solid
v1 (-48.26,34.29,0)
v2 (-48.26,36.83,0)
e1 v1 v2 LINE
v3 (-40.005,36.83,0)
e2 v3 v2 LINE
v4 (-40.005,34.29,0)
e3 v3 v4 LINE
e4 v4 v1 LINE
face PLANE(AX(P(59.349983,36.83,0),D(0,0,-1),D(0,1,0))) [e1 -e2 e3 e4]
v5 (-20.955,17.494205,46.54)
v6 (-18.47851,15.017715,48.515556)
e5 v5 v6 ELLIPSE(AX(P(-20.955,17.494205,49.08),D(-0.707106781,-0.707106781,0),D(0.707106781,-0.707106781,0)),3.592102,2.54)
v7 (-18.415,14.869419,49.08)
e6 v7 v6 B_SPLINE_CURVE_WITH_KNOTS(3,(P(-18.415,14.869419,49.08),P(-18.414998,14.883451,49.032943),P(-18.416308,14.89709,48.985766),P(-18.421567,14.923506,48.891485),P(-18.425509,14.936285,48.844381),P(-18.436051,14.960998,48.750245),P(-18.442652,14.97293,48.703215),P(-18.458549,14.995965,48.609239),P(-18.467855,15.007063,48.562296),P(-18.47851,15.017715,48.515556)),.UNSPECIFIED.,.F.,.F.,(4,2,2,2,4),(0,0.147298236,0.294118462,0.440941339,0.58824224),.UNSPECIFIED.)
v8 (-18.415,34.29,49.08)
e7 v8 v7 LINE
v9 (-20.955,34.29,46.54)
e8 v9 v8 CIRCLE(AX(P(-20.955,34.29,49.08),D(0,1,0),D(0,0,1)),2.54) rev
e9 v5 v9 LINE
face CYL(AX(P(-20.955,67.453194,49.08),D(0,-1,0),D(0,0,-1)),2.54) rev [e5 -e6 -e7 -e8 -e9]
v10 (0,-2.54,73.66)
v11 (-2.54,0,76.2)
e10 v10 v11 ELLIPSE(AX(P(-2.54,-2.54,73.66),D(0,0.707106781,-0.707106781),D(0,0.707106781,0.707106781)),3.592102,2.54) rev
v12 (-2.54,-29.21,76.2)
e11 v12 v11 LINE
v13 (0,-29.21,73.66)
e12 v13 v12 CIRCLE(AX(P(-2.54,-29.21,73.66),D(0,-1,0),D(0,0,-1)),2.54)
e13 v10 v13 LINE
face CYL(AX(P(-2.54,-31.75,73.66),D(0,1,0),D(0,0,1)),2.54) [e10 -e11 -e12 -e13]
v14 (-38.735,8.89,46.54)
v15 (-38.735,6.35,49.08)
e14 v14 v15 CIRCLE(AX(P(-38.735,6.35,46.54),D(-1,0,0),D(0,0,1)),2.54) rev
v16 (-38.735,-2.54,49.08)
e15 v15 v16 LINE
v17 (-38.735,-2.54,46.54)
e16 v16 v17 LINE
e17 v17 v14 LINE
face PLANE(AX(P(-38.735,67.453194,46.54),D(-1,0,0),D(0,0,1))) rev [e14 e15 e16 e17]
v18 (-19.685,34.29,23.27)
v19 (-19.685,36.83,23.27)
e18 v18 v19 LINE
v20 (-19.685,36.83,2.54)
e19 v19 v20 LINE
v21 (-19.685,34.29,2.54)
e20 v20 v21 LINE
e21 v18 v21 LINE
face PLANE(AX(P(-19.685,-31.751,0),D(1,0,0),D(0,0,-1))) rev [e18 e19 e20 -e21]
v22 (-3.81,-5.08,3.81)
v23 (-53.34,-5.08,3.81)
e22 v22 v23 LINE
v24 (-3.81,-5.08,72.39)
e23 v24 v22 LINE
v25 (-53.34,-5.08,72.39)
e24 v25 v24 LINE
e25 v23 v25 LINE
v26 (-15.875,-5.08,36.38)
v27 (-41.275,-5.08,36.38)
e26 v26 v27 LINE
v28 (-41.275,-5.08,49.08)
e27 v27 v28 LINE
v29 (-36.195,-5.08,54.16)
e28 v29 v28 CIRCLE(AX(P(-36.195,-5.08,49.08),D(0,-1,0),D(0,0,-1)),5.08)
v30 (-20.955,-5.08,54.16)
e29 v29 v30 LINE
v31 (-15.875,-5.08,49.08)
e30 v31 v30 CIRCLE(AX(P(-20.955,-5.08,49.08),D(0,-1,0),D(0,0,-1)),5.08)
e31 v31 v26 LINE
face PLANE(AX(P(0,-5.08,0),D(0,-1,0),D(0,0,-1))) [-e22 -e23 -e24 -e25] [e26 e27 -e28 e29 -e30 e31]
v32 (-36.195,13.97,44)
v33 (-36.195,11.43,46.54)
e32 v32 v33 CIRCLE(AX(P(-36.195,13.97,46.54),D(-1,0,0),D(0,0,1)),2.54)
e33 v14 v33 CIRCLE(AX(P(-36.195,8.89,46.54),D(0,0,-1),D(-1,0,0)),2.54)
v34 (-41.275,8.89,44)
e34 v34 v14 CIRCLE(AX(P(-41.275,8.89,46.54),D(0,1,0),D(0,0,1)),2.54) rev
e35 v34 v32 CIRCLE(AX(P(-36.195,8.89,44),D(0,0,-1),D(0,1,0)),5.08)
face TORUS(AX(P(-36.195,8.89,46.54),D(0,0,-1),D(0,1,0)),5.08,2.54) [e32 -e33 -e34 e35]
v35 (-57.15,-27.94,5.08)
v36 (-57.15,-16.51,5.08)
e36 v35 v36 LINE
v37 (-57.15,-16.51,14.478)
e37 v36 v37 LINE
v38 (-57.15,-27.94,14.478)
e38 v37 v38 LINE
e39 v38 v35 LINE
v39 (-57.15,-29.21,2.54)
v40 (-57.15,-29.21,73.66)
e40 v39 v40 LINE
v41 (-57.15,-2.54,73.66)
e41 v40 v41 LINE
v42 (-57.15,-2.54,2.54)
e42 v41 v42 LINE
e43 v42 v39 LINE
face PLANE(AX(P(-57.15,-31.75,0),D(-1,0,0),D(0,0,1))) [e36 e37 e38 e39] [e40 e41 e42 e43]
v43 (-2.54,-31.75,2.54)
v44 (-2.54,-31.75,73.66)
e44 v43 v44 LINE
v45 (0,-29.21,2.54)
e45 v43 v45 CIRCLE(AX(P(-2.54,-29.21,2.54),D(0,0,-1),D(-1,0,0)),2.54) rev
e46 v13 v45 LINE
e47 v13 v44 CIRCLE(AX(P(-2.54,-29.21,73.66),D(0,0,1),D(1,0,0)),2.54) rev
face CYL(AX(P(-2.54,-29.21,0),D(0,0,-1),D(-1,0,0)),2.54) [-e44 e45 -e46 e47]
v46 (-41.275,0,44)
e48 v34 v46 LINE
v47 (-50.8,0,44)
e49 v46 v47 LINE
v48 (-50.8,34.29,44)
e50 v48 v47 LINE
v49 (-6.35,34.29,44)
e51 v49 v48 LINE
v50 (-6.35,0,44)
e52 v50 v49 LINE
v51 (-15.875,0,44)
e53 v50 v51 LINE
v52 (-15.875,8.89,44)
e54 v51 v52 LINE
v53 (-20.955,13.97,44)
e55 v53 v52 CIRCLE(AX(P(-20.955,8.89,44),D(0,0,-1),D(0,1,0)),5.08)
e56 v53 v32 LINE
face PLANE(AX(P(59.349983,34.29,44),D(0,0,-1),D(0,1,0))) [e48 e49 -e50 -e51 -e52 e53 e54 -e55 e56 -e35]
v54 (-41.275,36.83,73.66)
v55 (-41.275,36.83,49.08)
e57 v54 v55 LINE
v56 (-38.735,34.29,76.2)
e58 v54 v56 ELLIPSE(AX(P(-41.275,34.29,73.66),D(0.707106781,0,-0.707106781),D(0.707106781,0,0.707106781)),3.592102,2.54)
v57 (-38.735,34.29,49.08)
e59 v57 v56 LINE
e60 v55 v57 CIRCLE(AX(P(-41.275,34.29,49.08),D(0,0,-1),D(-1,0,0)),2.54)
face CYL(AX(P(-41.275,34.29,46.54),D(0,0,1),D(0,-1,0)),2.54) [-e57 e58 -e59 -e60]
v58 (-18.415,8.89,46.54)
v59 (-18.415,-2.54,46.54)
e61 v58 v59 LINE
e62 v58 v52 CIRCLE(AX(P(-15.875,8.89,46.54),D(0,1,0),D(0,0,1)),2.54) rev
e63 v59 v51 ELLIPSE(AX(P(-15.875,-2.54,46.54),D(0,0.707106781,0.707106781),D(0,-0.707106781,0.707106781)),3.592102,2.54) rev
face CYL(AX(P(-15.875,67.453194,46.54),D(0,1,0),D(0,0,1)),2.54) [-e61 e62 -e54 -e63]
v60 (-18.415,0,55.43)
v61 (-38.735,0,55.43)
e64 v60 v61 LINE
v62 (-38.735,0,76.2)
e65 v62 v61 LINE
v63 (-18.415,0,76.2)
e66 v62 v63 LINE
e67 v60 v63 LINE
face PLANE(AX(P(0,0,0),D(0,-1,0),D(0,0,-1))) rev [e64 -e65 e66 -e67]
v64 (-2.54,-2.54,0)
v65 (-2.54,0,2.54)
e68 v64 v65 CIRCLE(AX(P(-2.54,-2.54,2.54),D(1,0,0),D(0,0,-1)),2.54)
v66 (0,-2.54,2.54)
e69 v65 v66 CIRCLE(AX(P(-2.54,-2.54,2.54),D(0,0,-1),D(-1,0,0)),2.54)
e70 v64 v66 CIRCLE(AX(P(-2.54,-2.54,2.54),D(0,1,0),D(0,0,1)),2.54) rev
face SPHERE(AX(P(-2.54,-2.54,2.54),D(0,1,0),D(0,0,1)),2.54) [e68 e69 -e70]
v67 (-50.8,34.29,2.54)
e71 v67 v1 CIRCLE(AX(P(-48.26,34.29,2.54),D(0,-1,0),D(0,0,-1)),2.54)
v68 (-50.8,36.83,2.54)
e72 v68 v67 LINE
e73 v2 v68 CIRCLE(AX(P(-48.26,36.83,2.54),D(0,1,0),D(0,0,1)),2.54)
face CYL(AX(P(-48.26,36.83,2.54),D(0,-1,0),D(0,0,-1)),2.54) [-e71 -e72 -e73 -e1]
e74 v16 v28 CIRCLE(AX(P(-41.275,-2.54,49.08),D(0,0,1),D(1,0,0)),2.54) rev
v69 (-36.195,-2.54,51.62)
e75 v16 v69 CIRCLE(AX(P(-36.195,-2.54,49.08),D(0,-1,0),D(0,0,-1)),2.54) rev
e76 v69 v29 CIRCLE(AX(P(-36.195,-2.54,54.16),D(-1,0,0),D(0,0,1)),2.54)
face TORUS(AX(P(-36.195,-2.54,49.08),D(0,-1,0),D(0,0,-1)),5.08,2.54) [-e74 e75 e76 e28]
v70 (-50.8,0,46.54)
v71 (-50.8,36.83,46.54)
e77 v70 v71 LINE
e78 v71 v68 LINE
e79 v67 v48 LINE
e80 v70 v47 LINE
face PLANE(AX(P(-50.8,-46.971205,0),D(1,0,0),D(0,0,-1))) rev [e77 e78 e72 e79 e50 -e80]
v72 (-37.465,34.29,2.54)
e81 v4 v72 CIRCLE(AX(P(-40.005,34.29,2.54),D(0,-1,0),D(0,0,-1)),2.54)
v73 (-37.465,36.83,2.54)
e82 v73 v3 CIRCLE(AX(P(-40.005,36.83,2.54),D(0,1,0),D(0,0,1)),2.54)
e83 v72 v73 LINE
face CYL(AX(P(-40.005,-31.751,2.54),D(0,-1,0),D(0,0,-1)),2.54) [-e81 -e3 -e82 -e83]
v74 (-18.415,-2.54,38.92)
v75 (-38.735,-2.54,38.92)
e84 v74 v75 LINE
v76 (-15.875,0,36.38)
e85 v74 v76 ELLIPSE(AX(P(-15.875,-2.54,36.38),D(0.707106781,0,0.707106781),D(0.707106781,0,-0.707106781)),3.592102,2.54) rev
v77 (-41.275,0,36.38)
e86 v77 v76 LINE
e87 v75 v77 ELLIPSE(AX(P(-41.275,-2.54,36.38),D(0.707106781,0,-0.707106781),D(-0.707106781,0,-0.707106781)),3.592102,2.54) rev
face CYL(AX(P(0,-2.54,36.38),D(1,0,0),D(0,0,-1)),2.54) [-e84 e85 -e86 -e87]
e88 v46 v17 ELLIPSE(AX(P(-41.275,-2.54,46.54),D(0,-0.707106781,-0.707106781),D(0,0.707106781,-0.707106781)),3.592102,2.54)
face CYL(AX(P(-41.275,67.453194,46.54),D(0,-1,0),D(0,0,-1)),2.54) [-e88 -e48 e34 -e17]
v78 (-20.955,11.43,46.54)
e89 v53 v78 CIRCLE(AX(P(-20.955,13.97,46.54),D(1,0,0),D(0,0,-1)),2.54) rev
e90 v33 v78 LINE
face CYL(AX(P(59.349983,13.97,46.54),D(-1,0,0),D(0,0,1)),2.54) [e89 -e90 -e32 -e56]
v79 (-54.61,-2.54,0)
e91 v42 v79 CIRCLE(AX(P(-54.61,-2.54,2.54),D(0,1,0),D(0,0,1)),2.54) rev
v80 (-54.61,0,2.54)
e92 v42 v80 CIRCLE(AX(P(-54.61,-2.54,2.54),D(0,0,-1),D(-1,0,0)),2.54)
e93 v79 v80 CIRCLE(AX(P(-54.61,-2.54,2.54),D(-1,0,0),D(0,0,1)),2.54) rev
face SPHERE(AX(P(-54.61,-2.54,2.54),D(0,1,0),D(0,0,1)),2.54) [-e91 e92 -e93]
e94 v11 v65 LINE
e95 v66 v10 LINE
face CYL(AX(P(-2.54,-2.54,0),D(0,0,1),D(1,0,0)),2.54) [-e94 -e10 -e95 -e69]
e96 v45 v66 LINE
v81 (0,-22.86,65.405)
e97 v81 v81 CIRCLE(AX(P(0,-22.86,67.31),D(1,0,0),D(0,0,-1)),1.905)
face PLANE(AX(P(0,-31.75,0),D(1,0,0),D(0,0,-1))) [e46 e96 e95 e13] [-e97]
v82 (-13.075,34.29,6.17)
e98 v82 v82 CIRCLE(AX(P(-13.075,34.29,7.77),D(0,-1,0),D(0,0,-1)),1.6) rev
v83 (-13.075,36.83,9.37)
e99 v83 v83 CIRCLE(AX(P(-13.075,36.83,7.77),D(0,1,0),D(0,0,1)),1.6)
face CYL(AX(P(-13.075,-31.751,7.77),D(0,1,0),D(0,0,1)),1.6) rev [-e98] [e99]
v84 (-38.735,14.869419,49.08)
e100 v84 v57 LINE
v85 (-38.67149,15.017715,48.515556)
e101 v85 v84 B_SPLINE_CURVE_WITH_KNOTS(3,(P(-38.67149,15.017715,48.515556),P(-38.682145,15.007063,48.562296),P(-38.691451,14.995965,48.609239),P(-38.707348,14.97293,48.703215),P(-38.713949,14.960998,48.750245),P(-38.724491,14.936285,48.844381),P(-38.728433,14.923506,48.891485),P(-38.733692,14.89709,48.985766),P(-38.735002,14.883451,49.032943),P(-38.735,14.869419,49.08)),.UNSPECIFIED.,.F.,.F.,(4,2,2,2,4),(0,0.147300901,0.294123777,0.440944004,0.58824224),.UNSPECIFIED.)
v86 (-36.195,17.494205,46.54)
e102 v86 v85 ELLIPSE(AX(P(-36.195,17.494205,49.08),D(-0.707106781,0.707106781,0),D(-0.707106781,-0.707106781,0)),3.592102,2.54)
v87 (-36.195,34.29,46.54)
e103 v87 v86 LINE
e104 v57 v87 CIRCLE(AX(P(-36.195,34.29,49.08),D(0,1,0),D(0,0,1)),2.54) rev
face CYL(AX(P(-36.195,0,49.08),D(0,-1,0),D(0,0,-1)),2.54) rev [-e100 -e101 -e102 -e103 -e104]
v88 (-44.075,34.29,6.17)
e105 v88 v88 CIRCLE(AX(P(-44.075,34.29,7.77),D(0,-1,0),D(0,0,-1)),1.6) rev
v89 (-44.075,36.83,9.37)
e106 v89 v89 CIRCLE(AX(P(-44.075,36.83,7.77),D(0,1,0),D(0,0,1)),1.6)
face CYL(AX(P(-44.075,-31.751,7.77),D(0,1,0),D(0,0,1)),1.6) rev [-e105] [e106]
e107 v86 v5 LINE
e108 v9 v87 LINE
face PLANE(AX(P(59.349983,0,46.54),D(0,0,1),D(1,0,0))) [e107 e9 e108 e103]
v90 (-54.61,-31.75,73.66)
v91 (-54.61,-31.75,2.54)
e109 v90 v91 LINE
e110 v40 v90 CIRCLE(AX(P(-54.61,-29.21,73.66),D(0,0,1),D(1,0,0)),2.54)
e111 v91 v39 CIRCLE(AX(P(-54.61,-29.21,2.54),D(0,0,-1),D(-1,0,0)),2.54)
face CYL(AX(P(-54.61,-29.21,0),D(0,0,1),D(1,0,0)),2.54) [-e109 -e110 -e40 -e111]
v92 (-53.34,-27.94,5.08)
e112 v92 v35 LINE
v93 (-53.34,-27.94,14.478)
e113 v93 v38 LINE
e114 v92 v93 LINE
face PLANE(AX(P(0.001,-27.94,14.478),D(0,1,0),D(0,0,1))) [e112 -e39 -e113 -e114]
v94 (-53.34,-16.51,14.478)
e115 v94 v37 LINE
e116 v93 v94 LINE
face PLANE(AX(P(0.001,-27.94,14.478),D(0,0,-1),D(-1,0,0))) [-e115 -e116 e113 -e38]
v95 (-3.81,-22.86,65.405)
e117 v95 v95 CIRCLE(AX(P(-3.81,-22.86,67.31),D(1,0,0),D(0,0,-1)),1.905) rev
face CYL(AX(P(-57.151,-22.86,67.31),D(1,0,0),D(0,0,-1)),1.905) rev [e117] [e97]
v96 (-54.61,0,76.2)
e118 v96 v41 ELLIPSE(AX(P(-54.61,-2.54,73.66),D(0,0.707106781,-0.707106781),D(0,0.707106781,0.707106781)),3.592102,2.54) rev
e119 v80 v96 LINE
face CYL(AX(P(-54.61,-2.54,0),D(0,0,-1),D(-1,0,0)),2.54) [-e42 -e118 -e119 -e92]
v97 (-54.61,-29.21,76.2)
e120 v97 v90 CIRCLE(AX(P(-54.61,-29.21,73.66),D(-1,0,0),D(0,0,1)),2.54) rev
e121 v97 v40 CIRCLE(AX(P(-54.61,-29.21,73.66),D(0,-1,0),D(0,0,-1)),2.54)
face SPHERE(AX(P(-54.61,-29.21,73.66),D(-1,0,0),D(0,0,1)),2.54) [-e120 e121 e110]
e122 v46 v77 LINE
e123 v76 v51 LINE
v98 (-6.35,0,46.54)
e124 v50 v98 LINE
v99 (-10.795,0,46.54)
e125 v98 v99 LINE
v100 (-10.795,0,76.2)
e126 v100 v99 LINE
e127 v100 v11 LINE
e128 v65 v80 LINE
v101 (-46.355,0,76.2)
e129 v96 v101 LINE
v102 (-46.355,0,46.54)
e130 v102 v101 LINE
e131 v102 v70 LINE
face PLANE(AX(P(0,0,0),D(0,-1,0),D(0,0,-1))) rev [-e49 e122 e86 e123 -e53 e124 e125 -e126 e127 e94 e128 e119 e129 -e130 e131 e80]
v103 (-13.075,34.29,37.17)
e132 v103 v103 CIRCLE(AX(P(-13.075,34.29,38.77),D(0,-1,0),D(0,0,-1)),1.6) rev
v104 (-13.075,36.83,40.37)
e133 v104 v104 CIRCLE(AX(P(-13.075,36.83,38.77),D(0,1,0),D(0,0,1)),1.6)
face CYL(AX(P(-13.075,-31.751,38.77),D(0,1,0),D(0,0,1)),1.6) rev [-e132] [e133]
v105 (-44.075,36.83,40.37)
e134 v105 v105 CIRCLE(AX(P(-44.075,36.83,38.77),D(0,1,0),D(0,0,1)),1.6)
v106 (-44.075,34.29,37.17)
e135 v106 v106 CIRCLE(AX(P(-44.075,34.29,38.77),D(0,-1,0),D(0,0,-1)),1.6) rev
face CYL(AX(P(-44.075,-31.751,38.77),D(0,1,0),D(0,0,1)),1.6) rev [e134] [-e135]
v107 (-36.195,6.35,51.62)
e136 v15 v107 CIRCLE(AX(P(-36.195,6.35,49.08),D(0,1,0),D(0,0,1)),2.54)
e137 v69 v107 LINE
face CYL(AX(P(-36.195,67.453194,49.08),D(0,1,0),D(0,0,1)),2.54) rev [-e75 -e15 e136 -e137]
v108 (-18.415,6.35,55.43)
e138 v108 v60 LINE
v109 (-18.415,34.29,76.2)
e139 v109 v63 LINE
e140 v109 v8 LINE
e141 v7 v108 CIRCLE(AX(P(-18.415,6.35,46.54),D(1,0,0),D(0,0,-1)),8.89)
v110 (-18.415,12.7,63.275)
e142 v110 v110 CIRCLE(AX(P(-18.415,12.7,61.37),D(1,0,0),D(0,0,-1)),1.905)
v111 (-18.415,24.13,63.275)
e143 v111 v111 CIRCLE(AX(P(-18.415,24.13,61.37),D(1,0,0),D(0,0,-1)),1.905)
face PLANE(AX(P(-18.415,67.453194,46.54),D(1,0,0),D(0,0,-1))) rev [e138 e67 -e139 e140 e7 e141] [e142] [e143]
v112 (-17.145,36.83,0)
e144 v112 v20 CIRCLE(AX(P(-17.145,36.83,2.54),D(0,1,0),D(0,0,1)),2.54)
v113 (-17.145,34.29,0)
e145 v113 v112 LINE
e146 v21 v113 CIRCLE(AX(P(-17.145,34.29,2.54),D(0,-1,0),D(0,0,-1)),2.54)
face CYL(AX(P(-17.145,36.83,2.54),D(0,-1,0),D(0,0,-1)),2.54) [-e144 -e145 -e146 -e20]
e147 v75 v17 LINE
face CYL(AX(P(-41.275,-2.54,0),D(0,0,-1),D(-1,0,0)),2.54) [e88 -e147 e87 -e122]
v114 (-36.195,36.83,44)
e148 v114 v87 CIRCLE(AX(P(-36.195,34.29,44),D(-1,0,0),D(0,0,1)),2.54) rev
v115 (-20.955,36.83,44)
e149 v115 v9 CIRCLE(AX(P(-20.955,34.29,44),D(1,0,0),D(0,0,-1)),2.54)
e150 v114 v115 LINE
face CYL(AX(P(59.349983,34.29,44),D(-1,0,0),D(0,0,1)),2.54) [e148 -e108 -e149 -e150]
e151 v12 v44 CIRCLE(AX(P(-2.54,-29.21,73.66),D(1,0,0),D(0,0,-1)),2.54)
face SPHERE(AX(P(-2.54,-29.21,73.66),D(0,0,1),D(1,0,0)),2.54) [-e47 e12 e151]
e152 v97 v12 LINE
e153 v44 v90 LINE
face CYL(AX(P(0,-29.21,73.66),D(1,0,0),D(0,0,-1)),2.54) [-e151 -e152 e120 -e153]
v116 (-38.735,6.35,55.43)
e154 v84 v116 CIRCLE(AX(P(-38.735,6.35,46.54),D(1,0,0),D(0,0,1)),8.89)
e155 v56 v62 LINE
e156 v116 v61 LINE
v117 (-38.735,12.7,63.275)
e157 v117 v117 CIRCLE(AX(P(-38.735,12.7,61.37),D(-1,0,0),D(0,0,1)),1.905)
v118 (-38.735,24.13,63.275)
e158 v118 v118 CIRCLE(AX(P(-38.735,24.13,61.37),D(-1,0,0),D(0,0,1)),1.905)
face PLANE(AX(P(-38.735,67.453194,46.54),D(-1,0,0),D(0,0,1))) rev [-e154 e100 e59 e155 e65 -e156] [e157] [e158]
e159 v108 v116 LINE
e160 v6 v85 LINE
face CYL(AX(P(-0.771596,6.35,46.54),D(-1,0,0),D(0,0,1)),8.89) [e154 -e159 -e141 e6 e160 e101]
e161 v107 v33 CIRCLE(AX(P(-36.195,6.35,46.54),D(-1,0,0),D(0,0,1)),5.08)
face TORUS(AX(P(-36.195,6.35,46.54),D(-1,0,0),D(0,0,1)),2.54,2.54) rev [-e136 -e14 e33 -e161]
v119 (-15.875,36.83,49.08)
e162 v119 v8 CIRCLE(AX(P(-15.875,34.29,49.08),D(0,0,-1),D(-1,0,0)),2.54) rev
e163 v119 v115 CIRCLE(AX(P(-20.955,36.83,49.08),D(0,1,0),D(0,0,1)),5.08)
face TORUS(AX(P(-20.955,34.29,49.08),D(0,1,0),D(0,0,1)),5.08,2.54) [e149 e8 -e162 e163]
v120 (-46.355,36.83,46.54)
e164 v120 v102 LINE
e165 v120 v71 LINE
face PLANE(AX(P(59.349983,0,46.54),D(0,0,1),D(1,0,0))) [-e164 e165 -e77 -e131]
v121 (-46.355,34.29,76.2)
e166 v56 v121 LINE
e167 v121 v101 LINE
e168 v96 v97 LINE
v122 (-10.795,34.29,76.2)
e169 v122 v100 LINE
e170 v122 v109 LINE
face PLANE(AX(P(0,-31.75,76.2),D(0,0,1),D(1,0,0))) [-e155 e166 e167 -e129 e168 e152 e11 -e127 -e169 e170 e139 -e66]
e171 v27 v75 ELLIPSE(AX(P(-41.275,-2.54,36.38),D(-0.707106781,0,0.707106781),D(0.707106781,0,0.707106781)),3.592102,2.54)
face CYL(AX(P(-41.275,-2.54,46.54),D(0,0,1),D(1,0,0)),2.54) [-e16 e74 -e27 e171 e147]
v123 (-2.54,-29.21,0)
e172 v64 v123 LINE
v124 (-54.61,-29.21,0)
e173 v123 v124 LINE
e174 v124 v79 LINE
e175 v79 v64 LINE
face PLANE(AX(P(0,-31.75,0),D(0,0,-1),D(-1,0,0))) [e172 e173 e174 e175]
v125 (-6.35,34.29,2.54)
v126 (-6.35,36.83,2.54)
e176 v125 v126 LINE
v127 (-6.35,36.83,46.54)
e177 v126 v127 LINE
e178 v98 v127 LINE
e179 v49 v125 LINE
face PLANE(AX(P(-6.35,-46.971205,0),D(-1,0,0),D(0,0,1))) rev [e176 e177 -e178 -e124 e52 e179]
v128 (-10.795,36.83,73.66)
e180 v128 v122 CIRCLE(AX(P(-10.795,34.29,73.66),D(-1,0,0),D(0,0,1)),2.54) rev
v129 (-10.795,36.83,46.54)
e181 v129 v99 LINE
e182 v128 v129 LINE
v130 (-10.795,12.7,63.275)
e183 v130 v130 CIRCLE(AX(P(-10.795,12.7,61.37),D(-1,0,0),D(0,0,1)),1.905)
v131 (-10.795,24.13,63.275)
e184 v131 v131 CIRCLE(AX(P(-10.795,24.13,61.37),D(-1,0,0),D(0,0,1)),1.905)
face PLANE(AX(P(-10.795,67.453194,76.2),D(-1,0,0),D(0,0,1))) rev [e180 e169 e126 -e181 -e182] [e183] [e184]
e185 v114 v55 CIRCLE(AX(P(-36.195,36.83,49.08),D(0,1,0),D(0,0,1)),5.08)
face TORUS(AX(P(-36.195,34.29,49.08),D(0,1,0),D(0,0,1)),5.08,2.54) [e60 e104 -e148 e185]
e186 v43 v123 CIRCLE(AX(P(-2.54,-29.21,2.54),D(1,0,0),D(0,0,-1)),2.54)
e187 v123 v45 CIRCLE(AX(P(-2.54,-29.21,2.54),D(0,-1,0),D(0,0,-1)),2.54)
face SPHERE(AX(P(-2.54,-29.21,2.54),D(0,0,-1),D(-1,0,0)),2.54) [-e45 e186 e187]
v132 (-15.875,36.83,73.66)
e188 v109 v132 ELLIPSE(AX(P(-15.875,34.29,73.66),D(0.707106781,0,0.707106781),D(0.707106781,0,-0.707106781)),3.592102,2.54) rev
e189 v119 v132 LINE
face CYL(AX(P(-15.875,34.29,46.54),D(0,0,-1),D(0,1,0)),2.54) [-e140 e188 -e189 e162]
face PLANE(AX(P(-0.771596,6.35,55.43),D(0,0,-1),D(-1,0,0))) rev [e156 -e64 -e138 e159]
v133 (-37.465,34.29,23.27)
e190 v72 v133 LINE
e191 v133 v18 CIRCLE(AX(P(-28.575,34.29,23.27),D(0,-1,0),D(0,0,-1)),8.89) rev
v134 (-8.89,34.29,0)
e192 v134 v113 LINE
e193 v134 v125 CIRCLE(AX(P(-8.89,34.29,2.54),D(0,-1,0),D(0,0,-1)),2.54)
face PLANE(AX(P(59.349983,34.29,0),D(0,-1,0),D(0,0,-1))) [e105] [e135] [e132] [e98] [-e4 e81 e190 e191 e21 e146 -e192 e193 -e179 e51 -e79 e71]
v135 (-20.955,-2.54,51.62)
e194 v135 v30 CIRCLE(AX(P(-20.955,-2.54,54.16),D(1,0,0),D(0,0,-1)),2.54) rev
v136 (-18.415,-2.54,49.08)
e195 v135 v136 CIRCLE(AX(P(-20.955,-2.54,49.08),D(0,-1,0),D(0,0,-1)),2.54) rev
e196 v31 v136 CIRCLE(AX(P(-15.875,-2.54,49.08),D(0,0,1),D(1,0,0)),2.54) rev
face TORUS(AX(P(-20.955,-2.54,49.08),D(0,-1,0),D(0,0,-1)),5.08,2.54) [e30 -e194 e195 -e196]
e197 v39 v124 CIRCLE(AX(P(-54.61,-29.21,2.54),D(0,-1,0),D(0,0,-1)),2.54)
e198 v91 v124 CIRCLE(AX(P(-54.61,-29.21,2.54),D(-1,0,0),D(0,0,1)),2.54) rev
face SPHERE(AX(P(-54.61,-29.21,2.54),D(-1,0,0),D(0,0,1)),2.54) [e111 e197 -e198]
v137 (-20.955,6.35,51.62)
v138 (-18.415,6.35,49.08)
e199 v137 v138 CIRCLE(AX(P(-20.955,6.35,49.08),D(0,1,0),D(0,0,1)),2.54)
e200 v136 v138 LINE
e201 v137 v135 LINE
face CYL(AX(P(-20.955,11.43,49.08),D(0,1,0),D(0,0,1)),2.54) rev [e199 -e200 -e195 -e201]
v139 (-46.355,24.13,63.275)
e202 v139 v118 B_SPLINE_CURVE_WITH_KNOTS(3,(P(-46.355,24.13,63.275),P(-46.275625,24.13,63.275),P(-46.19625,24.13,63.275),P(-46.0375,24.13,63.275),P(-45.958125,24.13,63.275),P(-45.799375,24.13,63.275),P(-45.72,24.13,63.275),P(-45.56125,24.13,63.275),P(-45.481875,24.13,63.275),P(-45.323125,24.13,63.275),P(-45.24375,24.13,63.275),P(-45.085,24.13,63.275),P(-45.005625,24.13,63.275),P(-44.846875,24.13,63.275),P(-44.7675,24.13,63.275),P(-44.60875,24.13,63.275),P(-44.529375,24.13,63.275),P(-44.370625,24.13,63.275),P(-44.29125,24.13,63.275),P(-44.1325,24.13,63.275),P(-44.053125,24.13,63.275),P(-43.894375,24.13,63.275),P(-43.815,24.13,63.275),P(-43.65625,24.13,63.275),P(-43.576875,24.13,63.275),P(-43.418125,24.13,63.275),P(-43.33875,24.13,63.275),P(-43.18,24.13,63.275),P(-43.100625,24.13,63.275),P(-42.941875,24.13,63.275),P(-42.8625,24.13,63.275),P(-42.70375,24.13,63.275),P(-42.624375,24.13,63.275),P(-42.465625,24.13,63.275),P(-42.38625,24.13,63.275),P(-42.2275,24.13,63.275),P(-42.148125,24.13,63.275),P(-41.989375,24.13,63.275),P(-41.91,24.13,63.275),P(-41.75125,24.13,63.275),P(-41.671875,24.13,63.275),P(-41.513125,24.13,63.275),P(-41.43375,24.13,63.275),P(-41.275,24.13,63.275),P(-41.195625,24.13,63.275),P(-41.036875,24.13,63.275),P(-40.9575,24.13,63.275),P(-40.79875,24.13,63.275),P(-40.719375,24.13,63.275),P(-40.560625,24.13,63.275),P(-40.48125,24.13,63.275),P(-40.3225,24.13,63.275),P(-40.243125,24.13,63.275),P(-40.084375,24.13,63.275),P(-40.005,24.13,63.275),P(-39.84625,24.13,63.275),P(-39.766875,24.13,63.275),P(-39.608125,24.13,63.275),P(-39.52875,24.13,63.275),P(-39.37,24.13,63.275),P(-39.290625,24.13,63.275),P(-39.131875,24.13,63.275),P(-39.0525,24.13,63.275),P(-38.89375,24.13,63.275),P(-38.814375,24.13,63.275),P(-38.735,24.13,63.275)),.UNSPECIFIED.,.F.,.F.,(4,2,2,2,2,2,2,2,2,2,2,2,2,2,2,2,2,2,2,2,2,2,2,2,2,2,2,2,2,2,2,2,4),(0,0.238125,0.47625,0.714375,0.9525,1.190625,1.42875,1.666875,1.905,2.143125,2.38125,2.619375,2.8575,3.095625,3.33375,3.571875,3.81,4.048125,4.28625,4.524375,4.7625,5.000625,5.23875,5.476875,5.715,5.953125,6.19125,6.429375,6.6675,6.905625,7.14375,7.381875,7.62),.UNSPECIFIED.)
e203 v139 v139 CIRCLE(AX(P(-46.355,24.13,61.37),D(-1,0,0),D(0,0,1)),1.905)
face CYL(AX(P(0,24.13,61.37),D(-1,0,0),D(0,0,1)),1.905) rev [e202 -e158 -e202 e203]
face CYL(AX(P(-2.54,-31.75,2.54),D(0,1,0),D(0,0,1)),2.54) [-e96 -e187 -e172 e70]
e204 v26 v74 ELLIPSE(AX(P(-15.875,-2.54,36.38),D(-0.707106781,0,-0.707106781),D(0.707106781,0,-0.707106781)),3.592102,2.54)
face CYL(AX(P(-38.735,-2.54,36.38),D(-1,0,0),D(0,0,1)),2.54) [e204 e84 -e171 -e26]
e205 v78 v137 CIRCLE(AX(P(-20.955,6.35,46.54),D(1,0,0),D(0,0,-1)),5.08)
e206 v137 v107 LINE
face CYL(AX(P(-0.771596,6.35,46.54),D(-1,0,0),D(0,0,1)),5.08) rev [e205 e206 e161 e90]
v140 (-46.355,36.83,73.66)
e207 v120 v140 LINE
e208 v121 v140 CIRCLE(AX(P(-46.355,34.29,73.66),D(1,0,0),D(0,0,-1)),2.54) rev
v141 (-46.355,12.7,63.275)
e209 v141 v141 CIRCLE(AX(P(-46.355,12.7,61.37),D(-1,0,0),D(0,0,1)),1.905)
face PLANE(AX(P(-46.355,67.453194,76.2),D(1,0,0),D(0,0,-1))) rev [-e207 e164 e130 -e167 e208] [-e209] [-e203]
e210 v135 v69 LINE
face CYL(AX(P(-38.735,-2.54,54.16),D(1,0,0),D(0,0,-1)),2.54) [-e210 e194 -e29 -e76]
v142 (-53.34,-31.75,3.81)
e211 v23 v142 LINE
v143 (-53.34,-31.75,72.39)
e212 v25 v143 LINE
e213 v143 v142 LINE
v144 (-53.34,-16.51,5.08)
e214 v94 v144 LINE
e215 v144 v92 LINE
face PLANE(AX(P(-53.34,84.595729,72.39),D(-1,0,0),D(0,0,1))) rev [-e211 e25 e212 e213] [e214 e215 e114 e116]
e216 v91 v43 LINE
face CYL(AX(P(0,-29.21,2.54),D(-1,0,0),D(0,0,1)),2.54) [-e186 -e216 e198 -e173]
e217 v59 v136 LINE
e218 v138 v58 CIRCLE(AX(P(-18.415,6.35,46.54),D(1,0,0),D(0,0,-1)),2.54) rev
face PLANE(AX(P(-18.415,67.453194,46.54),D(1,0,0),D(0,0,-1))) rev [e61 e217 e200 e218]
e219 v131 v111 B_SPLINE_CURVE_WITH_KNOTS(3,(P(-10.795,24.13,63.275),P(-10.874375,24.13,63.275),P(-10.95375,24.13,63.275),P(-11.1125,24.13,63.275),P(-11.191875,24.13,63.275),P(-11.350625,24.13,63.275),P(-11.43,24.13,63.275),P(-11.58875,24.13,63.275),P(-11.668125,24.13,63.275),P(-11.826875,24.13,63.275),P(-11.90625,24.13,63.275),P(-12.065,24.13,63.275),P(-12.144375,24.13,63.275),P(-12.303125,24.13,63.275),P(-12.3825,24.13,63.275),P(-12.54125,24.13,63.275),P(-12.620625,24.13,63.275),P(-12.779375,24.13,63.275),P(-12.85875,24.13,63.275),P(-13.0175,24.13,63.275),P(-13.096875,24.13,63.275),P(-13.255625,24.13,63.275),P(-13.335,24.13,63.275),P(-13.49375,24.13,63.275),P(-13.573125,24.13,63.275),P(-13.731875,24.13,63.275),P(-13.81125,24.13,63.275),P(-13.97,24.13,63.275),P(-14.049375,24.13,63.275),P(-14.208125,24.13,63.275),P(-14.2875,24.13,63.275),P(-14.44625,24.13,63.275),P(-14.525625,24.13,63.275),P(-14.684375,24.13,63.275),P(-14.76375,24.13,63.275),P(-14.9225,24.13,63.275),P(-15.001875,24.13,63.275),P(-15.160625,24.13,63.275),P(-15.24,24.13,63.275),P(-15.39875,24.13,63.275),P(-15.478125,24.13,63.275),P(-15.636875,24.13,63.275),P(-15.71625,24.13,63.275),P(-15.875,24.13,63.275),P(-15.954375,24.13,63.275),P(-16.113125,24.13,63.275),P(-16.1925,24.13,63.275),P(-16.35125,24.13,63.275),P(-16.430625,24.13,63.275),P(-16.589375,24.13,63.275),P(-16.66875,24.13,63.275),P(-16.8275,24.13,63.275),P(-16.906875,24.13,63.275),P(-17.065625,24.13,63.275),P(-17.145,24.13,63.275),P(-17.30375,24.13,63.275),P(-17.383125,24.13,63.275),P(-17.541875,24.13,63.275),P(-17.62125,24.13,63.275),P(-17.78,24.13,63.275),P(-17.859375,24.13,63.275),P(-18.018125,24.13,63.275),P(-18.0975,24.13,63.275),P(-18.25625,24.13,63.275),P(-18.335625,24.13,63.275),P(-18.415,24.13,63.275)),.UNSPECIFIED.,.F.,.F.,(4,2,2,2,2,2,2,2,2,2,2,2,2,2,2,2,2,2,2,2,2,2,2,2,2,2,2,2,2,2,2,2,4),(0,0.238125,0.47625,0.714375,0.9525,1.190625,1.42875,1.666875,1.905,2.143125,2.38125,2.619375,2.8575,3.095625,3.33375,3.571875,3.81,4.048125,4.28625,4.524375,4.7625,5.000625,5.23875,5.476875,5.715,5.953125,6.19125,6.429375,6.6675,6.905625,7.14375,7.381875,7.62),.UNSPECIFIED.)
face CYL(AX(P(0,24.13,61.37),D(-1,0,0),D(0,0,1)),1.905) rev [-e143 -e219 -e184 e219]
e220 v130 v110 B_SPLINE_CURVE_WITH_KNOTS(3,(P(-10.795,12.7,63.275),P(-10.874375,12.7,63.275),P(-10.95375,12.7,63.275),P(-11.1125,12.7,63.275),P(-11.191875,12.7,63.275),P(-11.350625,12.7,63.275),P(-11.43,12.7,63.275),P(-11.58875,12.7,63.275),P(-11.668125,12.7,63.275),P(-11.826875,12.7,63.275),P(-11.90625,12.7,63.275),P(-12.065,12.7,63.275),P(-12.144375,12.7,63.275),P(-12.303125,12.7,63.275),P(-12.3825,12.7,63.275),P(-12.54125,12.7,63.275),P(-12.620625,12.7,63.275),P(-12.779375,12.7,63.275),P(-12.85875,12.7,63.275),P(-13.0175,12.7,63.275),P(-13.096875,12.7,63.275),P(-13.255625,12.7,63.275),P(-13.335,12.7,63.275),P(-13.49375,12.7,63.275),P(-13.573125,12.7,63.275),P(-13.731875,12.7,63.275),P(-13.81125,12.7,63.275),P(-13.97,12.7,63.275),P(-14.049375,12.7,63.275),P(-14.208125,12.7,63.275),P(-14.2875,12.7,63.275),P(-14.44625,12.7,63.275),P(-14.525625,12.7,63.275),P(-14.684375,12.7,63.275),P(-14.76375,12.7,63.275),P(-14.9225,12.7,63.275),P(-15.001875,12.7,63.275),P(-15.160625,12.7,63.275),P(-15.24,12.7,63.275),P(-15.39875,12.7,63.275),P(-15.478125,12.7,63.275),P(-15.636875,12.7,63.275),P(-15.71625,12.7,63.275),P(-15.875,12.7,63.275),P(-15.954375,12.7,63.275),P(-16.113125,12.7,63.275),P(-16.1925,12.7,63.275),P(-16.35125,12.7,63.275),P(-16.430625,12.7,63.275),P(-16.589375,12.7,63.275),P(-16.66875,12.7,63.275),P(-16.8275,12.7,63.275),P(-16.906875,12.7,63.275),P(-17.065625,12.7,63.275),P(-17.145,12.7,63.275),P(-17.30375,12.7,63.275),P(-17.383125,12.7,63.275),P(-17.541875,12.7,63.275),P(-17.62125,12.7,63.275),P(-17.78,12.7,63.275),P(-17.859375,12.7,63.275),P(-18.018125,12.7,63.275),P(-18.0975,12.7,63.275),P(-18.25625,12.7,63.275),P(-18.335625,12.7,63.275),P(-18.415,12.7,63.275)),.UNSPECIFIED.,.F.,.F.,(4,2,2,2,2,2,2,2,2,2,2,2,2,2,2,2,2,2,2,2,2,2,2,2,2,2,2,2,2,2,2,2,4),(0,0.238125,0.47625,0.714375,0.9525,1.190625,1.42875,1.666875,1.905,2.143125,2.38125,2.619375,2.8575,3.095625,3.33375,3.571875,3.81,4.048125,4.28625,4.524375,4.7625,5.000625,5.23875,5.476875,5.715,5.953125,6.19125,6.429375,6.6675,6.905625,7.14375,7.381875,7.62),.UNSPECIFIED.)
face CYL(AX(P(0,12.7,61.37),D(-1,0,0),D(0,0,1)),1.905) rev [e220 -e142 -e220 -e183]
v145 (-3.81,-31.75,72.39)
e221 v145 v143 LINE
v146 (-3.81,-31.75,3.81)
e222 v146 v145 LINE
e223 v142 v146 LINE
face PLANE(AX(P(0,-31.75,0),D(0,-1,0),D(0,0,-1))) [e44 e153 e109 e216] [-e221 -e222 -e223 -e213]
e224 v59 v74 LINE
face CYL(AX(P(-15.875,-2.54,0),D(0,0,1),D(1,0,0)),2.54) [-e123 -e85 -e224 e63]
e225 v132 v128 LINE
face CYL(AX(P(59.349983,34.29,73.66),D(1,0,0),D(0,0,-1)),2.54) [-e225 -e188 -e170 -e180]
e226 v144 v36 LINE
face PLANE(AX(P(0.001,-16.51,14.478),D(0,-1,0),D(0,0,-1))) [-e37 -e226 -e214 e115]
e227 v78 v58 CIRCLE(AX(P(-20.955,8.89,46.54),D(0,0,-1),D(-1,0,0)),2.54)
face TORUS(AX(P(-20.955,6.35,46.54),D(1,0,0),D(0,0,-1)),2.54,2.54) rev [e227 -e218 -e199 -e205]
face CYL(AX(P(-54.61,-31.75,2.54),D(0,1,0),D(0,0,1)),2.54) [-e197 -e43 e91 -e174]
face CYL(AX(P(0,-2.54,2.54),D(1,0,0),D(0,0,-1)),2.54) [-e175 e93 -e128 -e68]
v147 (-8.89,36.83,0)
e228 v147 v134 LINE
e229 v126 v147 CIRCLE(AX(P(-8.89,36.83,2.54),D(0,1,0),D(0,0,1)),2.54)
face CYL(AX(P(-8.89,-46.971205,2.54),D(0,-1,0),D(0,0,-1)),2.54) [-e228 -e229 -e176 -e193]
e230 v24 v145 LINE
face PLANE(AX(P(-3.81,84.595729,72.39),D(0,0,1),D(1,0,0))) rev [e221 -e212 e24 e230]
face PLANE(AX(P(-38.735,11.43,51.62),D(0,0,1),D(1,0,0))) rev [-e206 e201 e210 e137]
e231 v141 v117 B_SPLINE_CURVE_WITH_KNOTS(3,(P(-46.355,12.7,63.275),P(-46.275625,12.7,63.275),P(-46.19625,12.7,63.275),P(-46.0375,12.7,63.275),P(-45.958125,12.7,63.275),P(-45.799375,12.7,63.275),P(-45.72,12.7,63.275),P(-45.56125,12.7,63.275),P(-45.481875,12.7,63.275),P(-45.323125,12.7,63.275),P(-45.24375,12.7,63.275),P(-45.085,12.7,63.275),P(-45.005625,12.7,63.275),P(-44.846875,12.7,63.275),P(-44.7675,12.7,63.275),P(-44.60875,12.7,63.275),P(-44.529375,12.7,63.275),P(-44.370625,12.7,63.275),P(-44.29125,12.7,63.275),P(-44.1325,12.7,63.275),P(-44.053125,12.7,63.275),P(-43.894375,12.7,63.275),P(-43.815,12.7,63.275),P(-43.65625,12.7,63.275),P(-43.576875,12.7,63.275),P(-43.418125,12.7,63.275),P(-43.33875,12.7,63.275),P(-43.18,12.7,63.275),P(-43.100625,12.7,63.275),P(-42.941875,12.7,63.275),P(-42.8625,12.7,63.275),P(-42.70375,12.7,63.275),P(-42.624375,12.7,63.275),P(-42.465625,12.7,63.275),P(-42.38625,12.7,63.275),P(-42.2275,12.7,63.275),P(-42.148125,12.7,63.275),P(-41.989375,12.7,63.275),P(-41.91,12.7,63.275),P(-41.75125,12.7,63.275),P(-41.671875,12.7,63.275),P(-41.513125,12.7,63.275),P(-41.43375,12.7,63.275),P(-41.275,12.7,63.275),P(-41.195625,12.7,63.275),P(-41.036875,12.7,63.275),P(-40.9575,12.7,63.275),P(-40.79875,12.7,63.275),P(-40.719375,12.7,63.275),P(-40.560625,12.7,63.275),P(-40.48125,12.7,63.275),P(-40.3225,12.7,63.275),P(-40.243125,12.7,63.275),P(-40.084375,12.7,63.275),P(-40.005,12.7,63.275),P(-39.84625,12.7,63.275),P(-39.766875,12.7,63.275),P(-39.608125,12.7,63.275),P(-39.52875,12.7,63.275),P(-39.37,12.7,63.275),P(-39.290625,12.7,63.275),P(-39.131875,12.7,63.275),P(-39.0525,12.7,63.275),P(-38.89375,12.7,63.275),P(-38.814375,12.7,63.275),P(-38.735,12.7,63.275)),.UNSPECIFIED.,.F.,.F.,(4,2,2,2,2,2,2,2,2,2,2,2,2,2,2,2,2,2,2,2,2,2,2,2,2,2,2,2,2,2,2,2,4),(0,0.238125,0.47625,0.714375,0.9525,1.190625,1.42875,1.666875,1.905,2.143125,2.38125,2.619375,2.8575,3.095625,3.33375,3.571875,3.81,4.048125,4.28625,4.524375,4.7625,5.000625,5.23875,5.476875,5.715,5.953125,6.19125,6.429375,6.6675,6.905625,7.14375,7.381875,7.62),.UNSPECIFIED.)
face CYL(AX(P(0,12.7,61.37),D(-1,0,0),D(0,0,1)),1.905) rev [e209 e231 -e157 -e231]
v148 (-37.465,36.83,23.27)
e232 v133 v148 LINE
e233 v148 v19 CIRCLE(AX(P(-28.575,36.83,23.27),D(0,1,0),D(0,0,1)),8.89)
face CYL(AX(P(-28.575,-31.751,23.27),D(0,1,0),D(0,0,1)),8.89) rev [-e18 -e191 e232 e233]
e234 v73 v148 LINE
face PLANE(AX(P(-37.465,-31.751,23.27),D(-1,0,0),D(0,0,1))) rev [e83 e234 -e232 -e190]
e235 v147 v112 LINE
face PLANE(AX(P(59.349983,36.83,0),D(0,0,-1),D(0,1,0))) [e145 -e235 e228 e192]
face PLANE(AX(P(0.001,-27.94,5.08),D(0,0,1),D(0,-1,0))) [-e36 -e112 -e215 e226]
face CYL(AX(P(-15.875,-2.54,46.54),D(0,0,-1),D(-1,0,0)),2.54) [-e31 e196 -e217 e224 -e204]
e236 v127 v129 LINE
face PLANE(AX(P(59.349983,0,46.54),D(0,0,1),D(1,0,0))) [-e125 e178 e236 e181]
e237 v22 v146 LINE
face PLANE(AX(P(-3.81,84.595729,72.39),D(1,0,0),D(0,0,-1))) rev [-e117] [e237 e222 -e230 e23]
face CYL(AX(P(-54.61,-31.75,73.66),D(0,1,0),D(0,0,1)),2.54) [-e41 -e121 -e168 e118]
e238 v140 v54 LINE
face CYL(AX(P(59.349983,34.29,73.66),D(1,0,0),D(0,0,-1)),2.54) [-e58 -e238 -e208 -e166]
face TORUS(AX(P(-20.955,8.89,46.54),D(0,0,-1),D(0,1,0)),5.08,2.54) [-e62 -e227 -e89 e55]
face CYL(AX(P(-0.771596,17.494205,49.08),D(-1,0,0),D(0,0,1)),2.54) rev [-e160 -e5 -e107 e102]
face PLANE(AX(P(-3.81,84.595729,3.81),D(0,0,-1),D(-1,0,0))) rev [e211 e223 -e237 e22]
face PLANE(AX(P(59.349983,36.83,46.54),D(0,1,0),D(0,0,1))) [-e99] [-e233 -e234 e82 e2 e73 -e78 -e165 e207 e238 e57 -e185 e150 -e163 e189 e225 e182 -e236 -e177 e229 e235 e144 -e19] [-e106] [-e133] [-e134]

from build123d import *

# Parameters (mm, degrees)
SKETCH3_W                         = 57.15
SKETCH3_H                         = 76.2
BOSS_EXTRUDE2_DEPTH               = 31.75
SKETCH4_W                         = 49.53
SKETCH4_H                         = 68.58
CUT_EXTRUDE2_DEPTH                = 26.67
POWER_HOLE_REACH                  = 102.402
SKETCH5_W                         = 9.398
SKETCH5_H                         = 11.43
MOTOR_MOUNTING_SHAPE_DEPTH        = 57.15
MOTOR_MOUNTING_HOLES_REACH        = 119.37
SKETCH8_R                         = 1.6
SKETCH7_W                         = 7.62
SKETCH7_H                         = 29.66
TRAY_SUPPORT_MOUNTING_SHAPE_DEPTH = 36.83
SKETCH9_W                         = 20.32
SKETCH9_H                         = 12.7
CUT_EXTRUDE3_DEPTH                = 16.51
SKETCH10_W                        = 6.35
SKETCH10_H                        = 46.54
CUT_EXTRUDE4_DEPTH                = 36.83
SKETCH11_R                        = 1.905
CUT_EXTRUDE5_DEPTH                = 97.497020291
BIGBUTTONWIREHOLE_REACH           = 104.123
SKETCH12_R                        = 1.905
BOSS_EXTRUDE3_DEPTH               = 20.32
FILLET2_R                         = 2.54
FILLET1_R                         = 2.54


with BuildPart() as part:
    # Sketch3 → Boss-Extrude2 (new body)
    with BuildSketch(Plane(origin=(0, 0, 0), x_dir=(-1, 0, 0), z_dir=(0, 1, 0))):
        with Locations((28.575, 38.1)):
            Rectangle(SKETCH3_W, SKETCH3_H)
    extrude(amount=-BOSS_EXTRUDE2_DEPTH)

    # Sketch4 → Cut-Extrude2 (cut)
    with BuildSketch(Plane.XZ.offset(31.75)):
        with Locations((-28.575, 38.1)):
            Rectangle(SKETCH4_W, SKETCH4_H)
    extrude(amount=-CUT_EXTRUDE2_DEPTH, mode=Mode.SUBTRACT)

    # Sketch5 → Power Hole (cut, up to next)
    with BuildSketch(Plane(origin=(-57.15, 0, 0), x_dir=(0, 0, -1), z_dir=(1, 0, 0)), mode=Mode.PRIVATE) as power_hole_sk1:
        with Locations((-9.779, -22.225)):
            Rectangle(SKETCH5_W, SKETCH5_H)
    power_hole_tool1 = extrude(power_hole_sk1.sketch, amount=POWER_HOLE_REACH, mode=Mode.PRIVATE) & part.part
    add(power_hole_tool1.solids().sort_by_distance((-57.15, -22.225, 9.779))[0], mode=Mode.SUBTRACT)

    # Sketch6 → Motor Mounting Shape (add)
    with BuildSketch(Plane.ZY.offset(57.15)):
        Polygon((46.54, 0), (46.54, 36.83), (0, 36.83), (0, 34.29), (44, 34.29), (44, 0), align=None)
    extrude(amount=-MOTOR_MOUNTING_SHAPE_DEPTH)

    # Sketch8 → Motor-Mounting-Holes (cut, up to next)
    with BuildSketch(Plane(origin=(0, 36.83, 0), x_dir=(1, 0, 0), z_dir=(0, 1, 0)), mode=Mode.PRIVATE) as motor_mounting_holes_sk1:
        with Locations(Location((-44.075, -7.77, 0), (0, 0, 270))):
            Circle(SKETCH8_R)
    motor_mounting_holes_tool1 = extrude(motor_mounting_holes_sk1.sketch, amount=-MOTOR_MOUNTING_HOLES_REACH, mode=Mode.PRIVATE) & part.part
    # Sketch8 → Motor-Mounting-Holes (cut, up to next)
    with BuildSketch(Plane(origin=(0, 36.83, 0), x_dir=(1, 0, 0), z_dir=(0, 1, 0)), mode=Mode.PRIVATE) as motor_mounting_holes_sk2:
        with Locations(Location((-13.075, -7.77, 0), (0, 0, 270))):
            Circle(SKETCH8_R)
    motor_mounting_holes_tool2 = extrude(motor_mounting_holes_sk2.sketch, amount=-MOTOR_MOUNTING_HOLES_REACH, mode=Mode.PRIVATE) & part.part
    # Sketch8 → Motor-Mounting-Holes (cut, up to next)
    with BuildSketch(Plane(origin=(0, 36.83, 0), x_dir=(1, 0, 0), z_dir=(0, 1, 0)), mode=Mode.PRIVATE) as motor_mounting_holes_sk3:
        with Locations(Location((-13.075, -38.77, 0), (0, 0, 270))):
            Circle(SKETCH8_R)
    motor_mounting_holes_tool3 = extrude(motor_mounting_holes_sk3.sketch, amount=-MOTOR_MOUNTING_HOLES_REACH, mode=Mode.PRIVATE) & part.part
    # Sketch8 → Motor-Mounting-Holes (cut, up to next)
    with BuildSketch(Plane(origin=(0, 36.83, 0), x_dir=(1, 0, 0), z_dir=(0, 1, 0)), mode=Mode.PRIVATE) as motor_mounting_holes_sk4:
        with Locations(Location((-44.075, -38.77, 0), (0, 0, 270))):
            Circle(SKETCH8_R)
    motor_mounting_holes_tool4 = extrude(motor_mounting_holes_sk4.sketch, amount=-MOTOR_MOUNTING_HOLES_REACH, mode=Mode.PRIVATE) & part.part
    # Sketch8 → Motor-Mounting-Holes (cut, up to next)
    with BuildSketch(Plane(origin=(0, 36.83, 0), x_dir=(1, 0, 0), z_dir=(0, 1, 0)), mode=Mode.PRIVATE) as motor_mounting_holes_sk5:
        with BuildLine():
            Line((-37.465, 0), (-19.685, 0))
            Line((-19.685, 0), (-19.685, -23.27))
            ThreePointArc((-19.685, -23.27), (-28.575, -32.16), (-37.465, -23.27))
            Line((-37.465, -23.27), (-37.465, 0))
        make_face()
    motor_mounting_holes_tool5 = extrude(motor_mounting_holes_sk5.sketch, amount=-MOTOR_MOUNTING_HOLES_REACH, mode=Mode.PRIVATE) & part.part
    add(motor_mounting_holes_tool1.solids().sort_by_distance((-44.075, 36.83, 7.77))[0], mode=Mode.SUBTRACT)
    add(motor_mounting_holes_tool2.solids().sort_by_distance((-13.075, 36.83, 7.77))[0], mode=Mode.SUBTRACT)
    add(motor_mounting_holes_tool3.solids().sort_by_distance((-13.075, 36.83, 38.77))[0], mode=Mode.SUBTRACT)
    add(motor_mounting_holes_tool4.solids().sort_by_distance((-44.075, 36.83, 38.77))[0], mode=Mode.SUBTRACT)
    add(motor_mounting_holes_tool5.solids().sort_by_distance((-28.575, 36.83, 15.191166))[0], mode=Mode.SUBTRACT)

    # Sketch7 → Tray Support Mounting Shape (add)
    with BuildSketch(Plane(origin=(0, 0, 0), x_dir=(1, 0, 0), z_dir=(0, 1, 0))):
        with Locations((-42.545, -61.37)):
            Rectangle(SKETCH7_W, SKETCH7_H)
        with Locations((-14.605, -61.37)):
            Rectangle(SKETCH7_W, SKETCH7_H)
    extrude(amount=TRAY_SUPPORT_MOUNTING_SHAPE_DEPTH)

    # Sketch9 → Cut-Extrude3 (cut)
    with BuildSketch(Plane.XZ.offset(5.08)):
        with Locations((-28.575, 45.27)):
            Rectangle(SKETCH9_W, SKETCH9_H)
    extrude(amount=-CUT_EXTRUDE3_DEPTH, mode=Mode.SUBTRACT)

    # Sketch10 → Cut-Extrude4 (cut)
    with BuildSketch(Plane(origin=(0, 36.83, 0), x_dir=(1, 0, 0), z_dir=(0, 1, 0))):
        with Locations((-53.975, -23.27)):
            Rectangle(SKETCH10_W, SKETCH10_H)
        with Locations((-3.175, -23.27)):
            Rectangle(SKETCH10_W, SKETCH10_H)
    extrude(amount=-CUT_EXTRUDE4_DEPTH, mode=Mode.SUBTRACT)

    # Sketch11 → Cut-Extrude5 (cut, through all)
    with BuildSketch(Plane.ZY.offset(46.355)):
        with Locations((61.37, 24.13)):
            Circle(SKETCH11_R)
        with Locations((61.37, 12.7)):
            Circle(SKETCH11_R)
    extrude(amount=-CUT_EXTRUDE5_DEPTH, mode=Mode.SUBTRACT)

    # Sketch12 → BigButtonWireHole (cut, up to next)
    with BuildSketch(Plane(origin=(0, 0, 0), x_dir=(0, 0, -1), z_dir=(1, 0, 0)), mode=Mode.PRIVATE) as bigbuttonwirehole_sk1:
        with Locations((-67.31, -22.86)):
            Circle(SKETCH12_R)
    bigbuttonwirehole_tool1 = extrude(bigbuttonwirehole_sk1.sketch, amount=-BIGBUTTONWIREHOLE_REACH, mode=Mode.PRIVATE) & part.part
    add(bigbuttonwirehole_tool1.solids().sort_by_distance((0, -22.86, 67.31))[0], mode=Mode.SUBTRACT)

    # Sketch13 → Boss-Extrude3 (add)
    with BuildSketch(Plane(origin=(-38.735, 0, 0), x_dir=(0, 0, -1), z_dir=(1, 0, 0))):
        with BuildLine():
            Line((-46.54, 11.43), (-46.54, 15.24))
            ThreePointArc((-46.54, 15.24), (-52.826179285, 12.636179285), (-55.43, 6.35))
            Line((-55.43, 6.35), (-55.43, 0))
            Line((-55.43, 0), (-51.62, 0))
            Line((-51.62, 0), (-51.62, 6.35))
            ThreePointArc((-51.62, 6.35), (-50.132102448, 9.942102448), (-46.54, 11.43))
        make_face()
    extrude(amount=BOSS_EXTRUDE3_DEPTH)

    # Fillet2
    fillet2_edges = [part.edges().sort_by_distance(p)[0] for p in [
        (-18.415, 5.715, 44),
        (-38.735, 5.715, 44),
        (-28.575, 0, 38.92),
        (-18.415, 0.635, 51.62),
        (-38.735, 0.635, 51.62),
        (-28.575, 11.43, 44),
        (-38.735, -5.08, 45.27),
        (-28.575, -5.08, 38.92),
        (-18.415, -5.08, 45.27),
        (-28.575, -5.08, 51.62),
        (-38.735, 9.942102448, 50.132102448),
        (-18.415, 9.942102448, 50.132102448),
        (-38.735, 0, 41.46),
        (-18.415, 0, 41.46),
    ]]
    fillet(fillet2_edges, radius=FILLET2_R - 0.0001)  # a hair under: the kernel refuses the full size

    # Fillet1
    fillet1_edges = [part.edges().sort_by_distance(p)[0] for p in [
        (-38.735, 26.035, 46.54),
        (-42.545, 36.83, 76.2),
        (-38.735, 36.83, 61.37),
        (-18.415, 26.035, 46.54),
        (-18.415, 36.83, 61.37),
        (-14.605, 36.83, 76.2),
        (-57.15, -31.75, 38.1),
        (-28.575, -31.75, 76.2),
        (-50.8, 35.56, 0),
        (-6.35, 35.56, 0),
        (-28.575, 15.24, 46.54),
        (0, -31.75, 38.1),
        (-57.15, 0, 38.1),
        (-28.575, 0, 0),
        (0, 0, 38.1),
        (0, -15.875, 76.2),
        (-57.15, -15.875, 76.2),
        (-19.685, 35.56, 0),
        (-37.465, 35.56, 0),
        (-57.15, -15.875, 0),
        (0, -15.875, 0),
        (-28.575, -31.75, 0),
        (-28.575, 36.83, 46.54),
    ]]
    fillet(fillet1_edges, radius=FILLET1_R)


solid = part.part
